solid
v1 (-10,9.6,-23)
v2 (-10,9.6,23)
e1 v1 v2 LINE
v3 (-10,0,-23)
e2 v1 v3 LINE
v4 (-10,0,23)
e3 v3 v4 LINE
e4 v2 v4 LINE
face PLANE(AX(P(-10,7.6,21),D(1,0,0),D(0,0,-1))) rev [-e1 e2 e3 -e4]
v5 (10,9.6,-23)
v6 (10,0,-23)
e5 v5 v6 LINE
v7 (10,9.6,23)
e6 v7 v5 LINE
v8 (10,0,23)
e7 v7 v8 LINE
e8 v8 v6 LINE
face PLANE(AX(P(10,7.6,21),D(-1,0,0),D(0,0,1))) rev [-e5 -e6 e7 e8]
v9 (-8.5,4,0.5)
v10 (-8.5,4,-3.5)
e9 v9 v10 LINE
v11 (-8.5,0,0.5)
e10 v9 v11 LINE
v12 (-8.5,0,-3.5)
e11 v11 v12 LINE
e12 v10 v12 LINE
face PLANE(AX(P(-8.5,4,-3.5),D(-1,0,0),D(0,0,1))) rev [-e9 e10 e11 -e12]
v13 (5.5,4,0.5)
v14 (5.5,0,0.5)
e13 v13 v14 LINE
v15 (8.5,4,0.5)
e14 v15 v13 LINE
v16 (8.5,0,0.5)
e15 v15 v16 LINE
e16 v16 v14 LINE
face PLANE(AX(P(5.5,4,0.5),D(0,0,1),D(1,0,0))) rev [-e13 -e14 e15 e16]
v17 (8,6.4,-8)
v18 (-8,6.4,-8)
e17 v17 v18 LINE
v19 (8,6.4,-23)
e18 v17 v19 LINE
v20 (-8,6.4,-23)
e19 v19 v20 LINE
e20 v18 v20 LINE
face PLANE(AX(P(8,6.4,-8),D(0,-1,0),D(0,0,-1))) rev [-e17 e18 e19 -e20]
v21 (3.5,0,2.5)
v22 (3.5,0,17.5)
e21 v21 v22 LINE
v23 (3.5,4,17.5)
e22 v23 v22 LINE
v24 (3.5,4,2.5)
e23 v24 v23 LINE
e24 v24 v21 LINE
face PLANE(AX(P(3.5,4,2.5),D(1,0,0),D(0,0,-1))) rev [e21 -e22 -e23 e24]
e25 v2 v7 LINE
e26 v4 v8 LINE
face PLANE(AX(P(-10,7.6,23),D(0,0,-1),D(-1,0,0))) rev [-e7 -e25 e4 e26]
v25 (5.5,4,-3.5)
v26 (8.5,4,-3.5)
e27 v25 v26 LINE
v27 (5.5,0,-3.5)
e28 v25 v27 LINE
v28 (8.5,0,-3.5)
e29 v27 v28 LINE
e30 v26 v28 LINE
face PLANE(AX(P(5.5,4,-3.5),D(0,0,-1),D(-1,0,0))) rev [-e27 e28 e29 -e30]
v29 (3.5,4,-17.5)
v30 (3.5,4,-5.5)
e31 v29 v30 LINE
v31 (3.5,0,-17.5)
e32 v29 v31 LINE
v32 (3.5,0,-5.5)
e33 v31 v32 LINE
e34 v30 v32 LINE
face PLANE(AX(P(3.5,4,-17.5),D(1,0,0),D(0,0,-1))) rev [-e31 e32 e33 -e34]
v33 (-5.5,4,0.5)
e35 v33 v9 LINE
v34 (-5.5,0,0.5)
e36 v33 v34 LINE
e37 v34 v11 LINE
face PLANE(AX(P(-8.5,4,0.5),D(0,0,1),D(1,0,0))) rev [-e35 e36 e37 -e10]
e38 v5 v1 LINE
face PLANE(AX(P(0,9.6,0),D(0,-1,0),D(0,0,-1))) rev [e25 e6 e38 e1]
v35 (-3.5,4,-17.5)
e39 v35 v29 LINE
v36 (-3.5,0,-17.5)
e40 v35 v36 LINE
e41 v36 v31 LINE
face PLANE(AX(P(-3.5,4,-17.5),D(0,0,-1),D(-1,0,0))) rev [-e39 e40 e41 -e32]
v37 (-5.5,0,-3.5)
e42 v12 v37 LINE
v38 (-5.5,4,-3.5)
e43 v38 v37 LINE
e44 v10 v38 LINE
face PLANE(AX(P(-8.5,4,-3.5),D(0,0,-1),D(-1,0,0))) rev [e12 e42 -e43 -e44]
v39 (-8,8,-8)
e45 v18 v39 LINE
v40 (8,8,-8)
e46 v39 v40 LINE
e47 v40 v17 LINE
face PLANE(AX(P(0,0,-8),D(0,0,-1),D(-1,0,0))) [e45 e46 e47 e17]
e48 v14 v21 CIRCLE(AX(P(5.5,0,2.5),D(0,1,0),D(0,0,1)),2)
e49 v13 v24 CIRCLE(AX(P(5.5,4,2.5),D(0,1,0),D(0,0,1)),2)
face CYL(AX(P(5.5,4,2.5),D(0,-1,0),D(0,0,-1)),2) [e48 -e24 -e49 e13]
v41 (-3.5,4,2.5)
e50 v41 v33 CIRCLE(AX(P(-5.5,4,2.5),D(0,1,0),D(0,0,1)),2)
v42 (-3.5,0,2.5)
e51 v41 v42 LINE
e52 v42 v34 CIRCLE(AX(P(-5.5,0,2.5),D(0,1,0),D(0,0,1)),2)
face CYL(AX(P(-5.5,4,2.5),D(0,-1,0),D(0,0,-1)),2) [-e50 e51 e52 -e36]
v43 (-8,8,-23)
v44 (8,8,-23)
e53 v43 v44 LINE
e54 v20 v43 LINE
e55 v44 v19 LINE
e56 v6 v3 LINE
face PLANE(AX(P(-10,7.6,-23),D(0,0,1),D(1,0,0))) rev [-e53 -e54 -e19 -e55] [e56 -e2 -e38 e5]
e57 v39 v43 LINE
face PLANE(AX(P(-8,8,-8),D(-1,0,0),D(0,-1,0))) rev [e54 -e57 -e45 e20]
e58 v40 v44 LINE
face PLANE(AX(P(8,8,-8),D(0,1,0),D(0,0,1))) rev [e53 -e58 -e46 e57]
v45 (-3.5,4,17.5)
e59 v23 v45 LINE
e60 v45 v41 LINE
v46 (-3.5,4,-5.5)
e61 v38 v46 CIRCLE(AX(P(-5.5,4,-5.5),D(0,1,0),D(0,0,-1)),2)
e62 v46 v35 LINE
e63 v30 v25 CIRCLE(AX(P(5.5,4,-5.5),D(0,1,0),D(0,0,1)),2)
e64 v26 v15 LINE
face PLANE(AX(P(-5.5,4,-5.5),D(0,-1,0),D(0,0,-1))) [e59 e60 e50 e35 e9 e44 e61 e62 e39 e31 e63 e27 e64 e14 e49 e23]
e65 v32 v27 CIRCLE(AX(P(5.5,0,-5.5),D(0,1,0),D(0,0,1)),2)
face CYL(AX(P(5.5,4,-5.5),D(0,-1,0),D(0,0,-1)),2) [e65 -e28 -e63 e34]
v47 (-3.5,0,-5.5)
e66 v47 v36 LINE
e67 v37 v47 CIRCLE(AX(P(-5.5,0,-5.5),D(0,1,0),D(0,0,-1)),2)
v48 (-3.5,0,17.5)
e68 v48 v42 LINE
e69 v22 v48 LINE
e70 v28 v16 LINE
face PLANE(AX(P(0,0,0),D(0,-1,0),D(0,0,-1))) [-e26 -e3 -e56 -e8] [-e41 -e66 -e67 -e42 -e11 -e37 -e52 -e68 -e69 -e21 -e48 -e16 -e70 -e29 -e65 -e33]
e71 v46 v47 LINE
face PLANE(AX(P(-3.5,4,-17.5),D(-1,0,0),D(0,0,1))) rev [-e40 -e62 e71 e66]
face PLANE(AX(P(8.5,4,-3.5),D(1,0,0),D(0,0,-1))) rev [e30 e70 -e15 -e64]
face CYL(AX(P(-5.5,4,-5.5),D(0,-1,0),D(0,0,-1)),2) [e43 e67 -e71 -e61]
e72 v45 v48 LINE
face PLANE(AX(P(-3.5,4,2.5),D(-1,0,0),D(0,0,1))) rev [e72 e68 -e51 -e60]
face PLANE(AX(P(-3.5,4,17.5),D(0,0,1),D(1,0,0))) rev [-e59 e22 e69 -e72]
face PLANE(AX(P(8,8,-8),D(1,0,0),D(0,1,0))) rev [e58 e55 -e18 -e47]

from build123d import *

# Parameters (mm, degrees)
SKETCH1_W           = 20
SKETCH1_H           = 42
BOSS_EXTRUDE1_DEPTH = 7.6
CUT_EXTRUDE1_DEPTH  = 4
THICKEN1_START      = -10
THICKEN1_DEPTH      = 20
SKETCH7_W           = 16
SKETCH7_H           = 1.6
CUT_EXTRUDE6_DEPTH  = 15


# Read off the part's stored shape, not the designer's step: Thicken1
with BuildPart() as part:
    # Sketch1 → Boss-Extrude1 (new body)
    with BuildSketch(Plane(origin=(0, 0, 0), x_dir=(1, 0, 0), z_dir=(0, 1, 0))):
        Rectangle(SKETCH1_W, SKETCH1_H)
    extrude(amount=BOSS_EXTRUDE1_DEPTH)

    # Sketch2 → Cut-Extrude1 (cut)
    with BuildSketch(Plane.XZ):
        with BuildLine():
            Line((-3.5, -17.5), (3.5, -17.5))
            Line((3.5, -17.5), (3.5, -5.5))
            ThreePointArc((3.5, -5.5), (4.085786438, -4.085786438), (5.5, -3.5))
            Line((5.5, -3.5), (8.5, -3.5))
            Line((8.5, -3.5), (8.5, 0.5))
            Line((8.5, 0.5), (5.5, 0.5))
            ThreePointArc((5.5, 0.5), (4.085786438, 1.085786438), (3.5, 2.5))
            Line((3.5, 2.5), (3.5, 17.5))
            Line((3.5, 17.5), (-3.5, 17.5))
            Line((-3.5, 17.5), (-3.5, 2.5))
            ThreePointArc((-3.5, 2.5), (-4.085786438, 1.085786438), (-5.5, 0.5))
            Line((-5.5, 0.5), (-8.5, 0.5))
            Line((-8.5, 0.5), (-8.5, -3.5))
            Line((-8.5, -3.5), (-5.5, -3.5))
            ThreePointArc((-5.5, -3.5), (-4.085786438, -4.085786438), (-3.5, -5.5))
            Line((-3.5, -5.5), (-3.5, -17.5))
        make_face()
    extrude(amount=-CUT_EXTRUDE1_DEPTH, mode=Mode.SUBTRACT)

    # Thicken1 outline → Thicken1 (add)
    with BuildSketch(Plane.YZ.offset(THICKEN1_START)):
        Polygon((0, -23), (9.6, -23), (9.6, 23), (0, 23), (0, 21), (7.6, 21), (7.6, -21), (0, -21), align=None)
    extrude(amount=THICKEN1_DEPTH)

    # Sketch7 → Cut-Extrude6 (cut)
    with BuildSketch(Plane(origin=(0, 0, -23), x_dir=(-1, 0, 0), z_dir=(0, 0, -1))):
        with Locations((0, 7.2)):
            Rectangle(SKETCH7_W, SKETCH7_H)
    extrude(amount=-CUT_EXTRUDE6_DEPTH, mode=Mode.SUBTRACT)


solid = part.part
